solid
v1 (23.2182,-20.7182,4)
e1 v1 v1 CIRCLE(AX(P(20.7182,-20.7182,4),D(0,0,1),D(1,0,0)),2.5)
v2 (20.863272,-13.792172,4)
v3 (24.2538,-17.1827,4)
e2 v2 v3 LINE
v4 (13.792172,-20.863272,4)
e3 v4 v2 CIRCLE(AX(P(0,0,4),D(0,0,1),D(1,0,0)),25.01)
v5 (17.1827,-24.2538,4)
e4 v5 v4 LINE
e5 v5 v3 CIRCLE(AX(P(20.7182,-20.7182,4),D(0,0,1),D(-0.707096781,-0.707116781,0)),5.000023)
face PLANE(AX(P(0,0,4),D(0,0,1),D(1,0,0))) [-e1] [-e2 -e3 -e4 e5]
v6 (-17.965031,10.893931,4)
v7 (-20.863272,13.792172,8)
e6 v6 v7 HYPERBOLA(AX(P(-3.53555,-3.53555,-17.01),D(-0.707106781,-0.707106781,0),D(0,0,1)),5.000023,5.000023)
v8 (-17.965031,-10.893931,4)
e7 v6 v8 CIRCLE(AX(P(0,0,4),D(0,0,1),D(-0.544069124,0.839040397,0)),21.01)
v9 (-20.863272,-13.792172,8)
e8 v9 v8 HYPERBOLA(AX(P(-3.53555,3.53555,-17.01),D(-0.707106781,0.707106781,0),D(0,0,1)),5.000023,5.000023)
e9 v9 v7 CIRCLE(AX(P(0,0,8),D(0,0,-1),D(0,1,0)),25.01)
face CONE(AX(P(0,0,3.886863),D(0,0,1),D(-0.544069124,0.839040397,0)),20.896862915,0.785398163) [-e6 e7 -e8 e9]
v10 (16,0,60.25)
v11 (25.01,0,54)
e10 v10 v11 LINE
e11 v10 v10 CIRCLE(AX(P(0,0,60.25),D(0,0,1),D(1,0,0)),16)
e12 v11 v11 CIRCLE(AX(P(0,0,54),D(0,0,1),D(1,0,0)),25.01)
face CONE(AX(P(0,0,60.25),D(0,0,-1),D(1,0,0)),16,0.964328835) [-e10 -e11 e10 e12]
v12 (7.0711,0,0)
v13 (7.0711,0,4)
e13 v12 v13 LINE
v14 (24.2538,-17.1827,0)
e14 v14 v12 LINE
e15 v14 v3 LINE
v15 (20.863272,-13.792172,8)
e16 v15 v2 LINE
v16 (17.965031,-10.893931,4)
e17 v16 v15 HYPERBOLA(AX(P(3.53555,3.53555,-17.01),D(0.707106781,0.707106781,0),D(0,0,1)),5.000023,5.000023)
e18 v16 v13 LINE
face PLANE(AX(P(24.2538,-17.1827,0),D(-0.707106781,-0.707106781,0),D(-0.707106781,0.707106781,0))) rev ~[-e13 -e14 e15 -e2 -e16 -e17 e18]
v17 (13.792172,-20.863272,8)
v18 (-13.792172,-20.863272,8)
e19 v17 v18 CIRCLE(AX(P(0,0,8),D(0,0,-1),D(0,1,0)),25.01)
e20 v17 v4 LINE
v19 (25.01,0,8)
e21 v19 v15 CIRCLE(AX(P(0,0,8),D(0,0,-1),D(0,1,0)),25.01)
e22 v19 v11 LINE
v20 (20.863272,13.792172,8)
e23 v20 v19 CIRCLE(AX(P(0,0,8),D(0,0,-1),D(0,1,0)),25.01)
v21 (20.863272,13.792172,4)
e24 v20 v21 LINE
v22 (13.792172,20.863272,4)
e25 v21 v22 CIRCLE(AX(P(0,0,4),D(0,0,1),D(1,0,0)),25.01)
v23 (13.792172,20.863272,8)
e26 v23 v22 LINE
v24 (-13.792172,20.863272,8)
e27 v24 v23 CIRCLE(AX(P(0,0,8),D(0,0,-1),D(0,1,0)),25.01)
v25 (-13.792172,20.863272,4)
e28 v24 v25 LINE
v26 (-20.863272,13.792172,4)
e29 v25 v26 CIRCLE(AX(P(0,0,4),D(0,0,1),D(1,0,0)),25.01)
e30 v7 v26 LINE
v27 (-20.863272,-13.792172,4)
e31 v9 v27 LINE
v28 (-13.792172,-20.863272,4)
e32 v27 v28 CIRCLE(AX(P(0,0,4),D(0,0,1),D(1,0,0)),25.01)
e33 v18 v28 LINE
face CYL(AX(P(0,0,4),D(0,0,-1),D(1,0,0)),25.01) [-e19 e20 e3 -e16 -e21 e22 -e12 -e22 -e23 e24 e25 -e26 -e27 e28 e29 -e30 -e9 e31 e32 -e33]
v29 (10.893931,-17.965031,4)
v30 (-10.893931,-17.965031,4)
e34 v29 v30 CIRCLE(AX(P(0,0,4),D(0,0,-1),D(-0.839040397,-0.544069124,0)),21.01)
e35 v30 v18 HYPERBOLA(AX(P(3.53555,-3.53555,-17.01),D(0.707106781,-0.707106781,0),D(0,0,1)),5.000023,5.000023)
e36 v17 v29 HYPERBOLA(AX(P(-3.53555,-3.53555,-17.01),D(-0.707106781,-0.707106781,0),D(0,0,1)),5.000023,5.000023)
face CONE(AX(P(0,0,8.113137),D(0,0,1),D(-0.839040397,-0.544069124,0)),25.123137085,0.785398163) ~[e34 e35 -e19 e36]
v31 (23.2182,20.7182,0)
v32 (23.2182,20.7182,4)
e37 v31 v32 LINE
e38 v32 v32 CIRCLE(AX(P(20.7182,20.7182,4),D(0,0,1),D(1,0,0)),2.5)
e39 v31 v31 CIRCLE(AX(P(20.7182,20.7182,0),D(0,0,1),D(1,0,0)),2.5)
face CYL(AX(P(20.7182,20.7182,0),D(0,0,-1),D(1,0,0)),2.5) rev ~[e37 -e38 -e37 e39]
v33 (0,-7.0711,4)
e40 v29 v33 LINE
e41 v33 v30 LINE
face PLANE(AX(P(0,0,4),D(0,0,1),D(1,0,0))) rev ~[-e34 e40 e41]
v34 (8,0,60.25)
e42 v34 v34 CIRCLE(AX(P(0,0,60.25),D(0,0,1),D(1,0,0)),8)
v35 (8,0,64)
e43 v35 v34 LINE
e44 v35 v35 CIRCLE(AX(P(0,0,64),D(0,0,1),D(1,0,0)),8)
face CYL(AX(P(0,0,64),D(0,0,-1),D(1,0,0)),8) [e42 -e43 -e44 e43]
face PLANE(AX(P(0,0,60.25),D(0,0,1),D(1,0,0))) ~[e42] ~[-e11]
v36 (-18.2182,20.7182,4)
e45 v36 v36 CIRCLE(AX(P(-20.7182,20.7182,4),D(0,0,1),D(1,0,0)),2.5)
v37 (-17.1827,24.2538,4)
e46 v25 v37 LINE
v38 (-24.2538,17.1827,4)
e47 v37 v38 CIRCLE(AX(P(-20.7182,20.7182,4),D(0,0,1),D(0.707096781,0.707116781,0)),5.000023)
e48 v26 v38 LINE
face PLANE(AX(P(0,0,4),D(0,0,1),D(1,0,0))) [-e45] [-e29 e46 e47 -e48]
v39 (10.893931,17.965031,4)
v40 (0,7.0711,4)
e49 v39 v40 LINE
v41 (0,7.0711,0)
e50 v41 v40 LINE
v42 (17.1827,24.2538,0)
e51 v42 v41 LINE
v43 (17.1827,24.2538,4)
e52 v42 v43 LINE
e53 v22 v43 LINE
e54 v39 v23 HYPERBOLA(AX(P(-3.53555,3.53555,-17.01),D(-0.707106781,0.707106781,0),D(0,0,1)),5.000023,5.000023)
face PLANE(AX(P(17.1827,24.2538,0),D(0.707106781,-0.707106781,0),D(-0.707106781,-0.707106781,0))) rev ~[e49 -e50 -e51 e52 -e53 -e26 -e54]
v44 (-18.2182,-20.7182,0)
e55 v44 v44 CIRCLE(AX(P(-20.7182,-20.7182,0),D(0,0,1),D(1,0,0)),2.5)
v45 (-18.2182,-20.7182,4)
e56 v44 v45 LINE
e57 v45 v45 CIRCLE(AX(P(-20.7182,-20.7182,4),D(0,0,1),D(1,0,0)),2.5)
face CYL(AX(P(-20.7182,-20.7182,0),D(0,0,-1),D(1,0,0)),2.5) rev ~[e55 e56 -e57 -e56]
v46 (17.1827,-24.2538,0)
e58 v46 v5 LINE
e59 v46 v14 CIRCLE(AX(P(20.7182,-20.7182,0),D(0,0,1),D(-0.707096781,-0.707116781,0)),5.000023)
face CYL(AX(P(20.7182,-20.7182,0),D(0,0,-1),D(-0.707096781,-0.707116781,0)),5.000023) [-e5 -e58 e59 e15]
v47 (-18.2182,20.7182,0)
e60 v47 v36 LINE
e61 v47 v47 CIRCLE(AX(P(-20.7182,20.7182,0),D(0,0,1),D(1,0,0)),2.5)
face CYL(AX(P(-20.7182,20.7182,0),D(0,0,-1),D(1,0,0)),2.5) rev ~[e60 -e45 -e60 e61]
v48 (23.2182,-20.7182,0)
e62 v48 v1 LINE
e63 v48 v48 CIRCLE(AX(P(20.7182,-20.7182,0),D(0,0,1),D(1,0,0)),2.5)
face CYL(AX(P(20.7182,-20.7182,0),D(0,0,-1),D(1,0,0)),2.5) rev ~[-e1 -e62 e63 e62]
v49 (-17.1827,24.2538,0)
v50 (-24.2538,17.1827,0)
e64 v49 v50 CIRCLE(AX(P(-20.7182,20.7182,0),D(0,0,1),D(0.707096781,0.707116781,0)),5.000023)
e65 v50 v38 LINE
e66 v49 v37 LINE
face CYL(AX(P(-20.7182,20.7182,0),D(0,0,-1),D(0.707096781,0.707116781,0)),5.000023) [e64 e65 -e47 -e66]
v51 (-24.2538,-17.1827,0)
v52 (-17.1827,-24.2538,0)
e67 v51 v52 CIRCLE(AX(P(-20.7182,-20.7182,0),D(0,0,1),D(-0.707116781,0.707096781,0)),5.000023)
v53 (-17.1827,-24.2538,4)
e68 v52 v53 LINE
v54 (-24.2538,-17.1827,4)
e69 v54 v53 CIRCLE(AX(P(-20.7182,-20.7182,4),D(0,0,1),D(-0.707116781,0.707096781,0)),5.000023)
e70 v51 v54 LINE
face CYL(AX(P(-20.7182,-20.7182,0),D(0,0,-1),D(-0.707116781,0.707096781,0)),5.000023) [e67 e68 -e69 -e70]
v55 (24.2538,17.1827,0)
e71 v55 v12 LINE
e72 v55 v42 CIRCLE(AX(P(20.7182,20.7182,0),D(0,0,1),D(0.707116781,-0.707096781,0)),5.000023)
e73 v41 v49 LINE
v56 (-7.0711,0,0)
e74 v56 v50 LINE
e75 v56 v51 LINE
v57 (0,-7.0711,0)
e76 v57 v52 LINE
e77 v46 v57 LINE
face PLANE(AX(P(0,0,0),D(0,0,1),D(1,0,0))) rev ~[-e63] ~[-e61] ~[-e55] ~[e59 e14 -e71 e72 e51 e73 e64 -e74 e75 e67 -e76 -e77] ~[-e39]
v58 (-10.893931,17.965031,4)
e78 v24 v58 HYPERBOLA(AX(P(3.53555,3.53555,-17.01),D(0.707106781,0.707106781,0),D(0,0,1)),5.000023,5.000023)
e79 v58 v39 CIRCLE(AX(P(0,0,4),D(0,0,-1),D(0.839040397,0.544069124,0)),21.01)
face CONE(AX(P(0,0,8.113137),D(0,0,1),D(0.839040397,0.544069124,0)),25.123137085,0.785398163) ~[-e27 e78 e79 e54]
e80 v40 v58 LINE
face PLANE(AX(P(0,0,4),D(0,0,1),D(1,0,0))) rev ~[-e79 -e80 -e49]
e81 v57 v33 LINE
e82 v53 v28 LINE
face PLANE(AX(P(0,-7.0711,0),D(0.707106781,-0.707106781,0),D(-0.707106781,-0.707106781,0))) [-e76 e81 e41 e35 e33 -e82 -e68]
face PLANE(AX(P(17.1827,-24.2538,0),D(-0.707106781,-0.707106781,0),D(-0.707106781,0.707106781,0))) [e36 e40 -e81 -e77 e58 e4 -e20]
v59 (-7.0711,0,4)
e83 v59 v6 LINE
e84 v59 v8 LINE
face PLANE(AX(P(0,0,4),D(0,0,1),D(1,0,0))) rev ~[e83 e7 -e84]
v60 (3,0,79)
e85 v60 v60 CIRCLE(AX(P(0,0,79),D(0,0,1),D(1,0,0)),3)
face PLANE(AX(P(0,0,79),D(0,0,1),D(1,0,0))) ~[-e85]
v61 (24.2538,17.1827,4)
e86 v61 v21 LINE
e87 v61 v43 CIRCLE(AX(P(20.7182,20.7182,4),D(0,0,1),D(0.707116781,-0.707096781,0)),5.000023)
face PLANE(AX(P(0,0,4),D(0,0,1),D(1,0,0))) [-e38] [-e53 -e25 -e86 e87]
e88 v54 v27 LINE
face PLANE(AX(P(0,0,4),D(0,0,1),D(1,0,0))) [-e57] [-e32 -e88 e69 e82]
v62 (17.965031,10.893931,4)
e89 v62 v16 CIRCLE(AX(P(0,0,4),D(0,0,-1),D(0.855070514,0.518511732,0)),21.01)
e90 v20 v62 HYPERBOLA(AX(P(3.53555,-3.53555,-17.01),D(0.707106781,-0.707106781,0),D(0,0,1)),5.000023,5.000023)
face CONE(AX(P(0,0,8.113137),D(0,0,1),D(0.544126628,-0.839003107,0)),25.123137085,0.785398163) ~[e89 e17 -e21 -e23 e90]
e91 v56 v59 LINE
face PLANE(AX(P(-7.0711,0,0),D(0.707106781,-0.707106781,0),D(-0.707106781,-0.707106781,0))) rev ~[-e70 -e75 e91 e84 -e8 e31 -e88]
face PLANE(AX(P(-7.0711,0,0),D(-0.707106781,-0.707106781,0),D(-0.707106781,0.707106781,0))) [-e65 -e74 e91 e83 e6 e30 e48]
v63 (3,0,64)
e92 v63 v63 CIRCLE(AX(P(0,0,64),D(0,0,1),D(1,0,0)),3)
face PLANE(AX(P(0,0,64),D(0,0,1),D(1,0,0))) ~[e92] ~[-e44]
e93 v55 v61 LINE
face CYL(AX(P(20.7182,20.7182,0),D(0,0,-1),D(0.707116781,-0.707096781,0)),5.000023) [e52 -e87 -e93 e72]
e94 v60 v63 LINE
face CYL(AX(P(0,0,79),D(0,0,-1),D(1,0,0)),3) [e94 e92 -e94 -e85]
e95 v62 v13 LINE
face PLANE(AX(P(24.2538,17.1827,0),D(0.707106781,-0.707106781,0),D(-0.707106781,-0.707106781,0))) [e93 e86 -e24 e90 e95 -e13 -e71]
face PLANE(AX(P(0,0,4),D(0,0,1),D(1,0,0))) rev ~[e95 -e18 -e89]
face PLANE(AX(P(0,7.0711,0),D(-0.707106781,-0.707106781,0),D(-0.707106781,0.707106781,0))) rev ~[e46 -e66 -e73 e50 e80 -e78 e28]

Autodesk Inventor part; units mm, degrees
ref_plane "YZ Plane" through (0, 0, 0) normal (1, 0, 0) x (0, 1, 0)
ref_plane "XZ Plane" through (0, 0, 0) normal (0, 1, 0) x (-1, 0, 0)
sketch "Sketch1" plane through (0, 0, 0) normal (0, 0, 1) x (1, 0, 0)
  line L0 (0, 0) -> (-20.7182, 20.7182) construction
  line L1 (7.0711, 0) -> (29.3, 0) construction
  line L2 (0, 0) -> (20.7182, 20.7182) construction
  line L3 (0, 0) -> (29.3, 0) construction
  line L4 (-20.7182, 20.7182) -> (20.7182, 20.7182) construction
  circle A0 centre (-20.7182, 20.7182) radius 2.5
  circle A1 centre (20.7182, 20.7182) radius 2.5
  circle A2 centre (-20.7182, -20.7182) radius 2.5
  circle A3 centre (20.7182, -20.7182) radius 2.5
  arc A4 (-24.2538, -17.1827) -> (-17.1827, -24.2538) centre (-20.7182, -20.7182) ccw
  line L5 (20.7182, 20.7182) -> (13.788, 27.6485) construction
  arc A5 (24.2538, 17.1827) -> (17.1827, 24.2538) centre (20.7182, 20.7182) ccw
  arc A6 (-17.1827, 24.2538) -> (-24.2538, 17.1827) centre (-20.7182, 20.7182) ccw
  arc A7 (17.1827, -24.2538) -> (24.2538, -17.1827) centre (20.7182, -20.7182) ccw
  line L6 (17.1827, 24.2538) -> (0, 7.0711)
  line L7 (-7.0711, 0) -> (-24.2538, -17.1827)
  line L8 (24.2538, -17.1827) -> (7.0711, 0)
  line L9 (0, 7.0711) -> (-17.1827, 24.2538)
  line L10 (24.2538, 17.1827) -> (7.0711, 0)
  line L11 (0, -7.0711) -> (-17.1827, -24.2538)
  line L12 (17.1827, -24.2538) -> (0, -7.0711)
  line L13 (-7.0711, 0) -> (-24.2538, 17.1827)
  dimension "d0" = 29.3
  dimension "d1" = 135
  dimension "d2" = 29.3
  dimension "d3" = 45
  dimension "d4" = 2.5
  dimension "d5" = 2.5
  dimension "d6" = 5
  dimension "d7" = 5
extrude "Extrusion1" add sketch "Sketch1" along normal blind 4
sketch "Sketch2" plane through (0, 0, 4) normal (0, 0, 1) x (1, 0, 0)
  circle A0 centre (0, 0) radius 25.01
  dimension "d10" = 25.01
extrude "Extrusion2" add sketch "Sketch2" along normal blind 50
chamfer "Chamfer1" distance 4 angle 45 4 edges at (23.9509, 7.201, 4) (0, -25.01, 4) (-25.01, 0, 4) (0, 25.01, 4)
sketch "Sketch3" plane through (0, 0, 54) normal (0, 0, 1) x (1, 0, 0)
  line L0 (0, 0) -> (25.01, 0)
  circle A0 centre (0, 0) radius 25.01 projected
sketch "Sketch4" plane through (0, 0, 0) normal (0, 0, -1) x (-1, 0, 0)
  point P0 (0, 0)
  point P1 (0, 0)
ref_plane "Work Plane1" through (0, 0, 0) normal (0, 1, 0) x (0, 0, 1)
sketch "Sketch5" plane through (0, 0, 0) normal (0, 1, 0) x (0, 0, 1)
  line L0 (54, -25.01) -> (54, 25.01) projected
  line L1 (54, 0) -> (79, 0)
  line L2 (79, 0) -> (79, 3)
  line L3 (79, 3) -> (64, 3)
  line L4 (64, 3) -> (64, 8)
  line L5 (64, 8) -> (60.25, 8)
  line L6 (60.25, 8) -> (60.25, 16)
  line L7 (60.25, 16) -> (54, 25.01)
  point P0 (0, 0)
  dimension "d16" = 25
  dimension "d17" = 3
  dimension "d18" = 15
  dimension "d19" = 5
  dimension "d20" = 3.75
  dimension "d21" = 8
revolve "Revolution1" add sketch "Sketch5" angle 360 about axis through (0, 0, 54) along (0, 0, 1)
properties part number "Motor Turnigy G60 500kv"
